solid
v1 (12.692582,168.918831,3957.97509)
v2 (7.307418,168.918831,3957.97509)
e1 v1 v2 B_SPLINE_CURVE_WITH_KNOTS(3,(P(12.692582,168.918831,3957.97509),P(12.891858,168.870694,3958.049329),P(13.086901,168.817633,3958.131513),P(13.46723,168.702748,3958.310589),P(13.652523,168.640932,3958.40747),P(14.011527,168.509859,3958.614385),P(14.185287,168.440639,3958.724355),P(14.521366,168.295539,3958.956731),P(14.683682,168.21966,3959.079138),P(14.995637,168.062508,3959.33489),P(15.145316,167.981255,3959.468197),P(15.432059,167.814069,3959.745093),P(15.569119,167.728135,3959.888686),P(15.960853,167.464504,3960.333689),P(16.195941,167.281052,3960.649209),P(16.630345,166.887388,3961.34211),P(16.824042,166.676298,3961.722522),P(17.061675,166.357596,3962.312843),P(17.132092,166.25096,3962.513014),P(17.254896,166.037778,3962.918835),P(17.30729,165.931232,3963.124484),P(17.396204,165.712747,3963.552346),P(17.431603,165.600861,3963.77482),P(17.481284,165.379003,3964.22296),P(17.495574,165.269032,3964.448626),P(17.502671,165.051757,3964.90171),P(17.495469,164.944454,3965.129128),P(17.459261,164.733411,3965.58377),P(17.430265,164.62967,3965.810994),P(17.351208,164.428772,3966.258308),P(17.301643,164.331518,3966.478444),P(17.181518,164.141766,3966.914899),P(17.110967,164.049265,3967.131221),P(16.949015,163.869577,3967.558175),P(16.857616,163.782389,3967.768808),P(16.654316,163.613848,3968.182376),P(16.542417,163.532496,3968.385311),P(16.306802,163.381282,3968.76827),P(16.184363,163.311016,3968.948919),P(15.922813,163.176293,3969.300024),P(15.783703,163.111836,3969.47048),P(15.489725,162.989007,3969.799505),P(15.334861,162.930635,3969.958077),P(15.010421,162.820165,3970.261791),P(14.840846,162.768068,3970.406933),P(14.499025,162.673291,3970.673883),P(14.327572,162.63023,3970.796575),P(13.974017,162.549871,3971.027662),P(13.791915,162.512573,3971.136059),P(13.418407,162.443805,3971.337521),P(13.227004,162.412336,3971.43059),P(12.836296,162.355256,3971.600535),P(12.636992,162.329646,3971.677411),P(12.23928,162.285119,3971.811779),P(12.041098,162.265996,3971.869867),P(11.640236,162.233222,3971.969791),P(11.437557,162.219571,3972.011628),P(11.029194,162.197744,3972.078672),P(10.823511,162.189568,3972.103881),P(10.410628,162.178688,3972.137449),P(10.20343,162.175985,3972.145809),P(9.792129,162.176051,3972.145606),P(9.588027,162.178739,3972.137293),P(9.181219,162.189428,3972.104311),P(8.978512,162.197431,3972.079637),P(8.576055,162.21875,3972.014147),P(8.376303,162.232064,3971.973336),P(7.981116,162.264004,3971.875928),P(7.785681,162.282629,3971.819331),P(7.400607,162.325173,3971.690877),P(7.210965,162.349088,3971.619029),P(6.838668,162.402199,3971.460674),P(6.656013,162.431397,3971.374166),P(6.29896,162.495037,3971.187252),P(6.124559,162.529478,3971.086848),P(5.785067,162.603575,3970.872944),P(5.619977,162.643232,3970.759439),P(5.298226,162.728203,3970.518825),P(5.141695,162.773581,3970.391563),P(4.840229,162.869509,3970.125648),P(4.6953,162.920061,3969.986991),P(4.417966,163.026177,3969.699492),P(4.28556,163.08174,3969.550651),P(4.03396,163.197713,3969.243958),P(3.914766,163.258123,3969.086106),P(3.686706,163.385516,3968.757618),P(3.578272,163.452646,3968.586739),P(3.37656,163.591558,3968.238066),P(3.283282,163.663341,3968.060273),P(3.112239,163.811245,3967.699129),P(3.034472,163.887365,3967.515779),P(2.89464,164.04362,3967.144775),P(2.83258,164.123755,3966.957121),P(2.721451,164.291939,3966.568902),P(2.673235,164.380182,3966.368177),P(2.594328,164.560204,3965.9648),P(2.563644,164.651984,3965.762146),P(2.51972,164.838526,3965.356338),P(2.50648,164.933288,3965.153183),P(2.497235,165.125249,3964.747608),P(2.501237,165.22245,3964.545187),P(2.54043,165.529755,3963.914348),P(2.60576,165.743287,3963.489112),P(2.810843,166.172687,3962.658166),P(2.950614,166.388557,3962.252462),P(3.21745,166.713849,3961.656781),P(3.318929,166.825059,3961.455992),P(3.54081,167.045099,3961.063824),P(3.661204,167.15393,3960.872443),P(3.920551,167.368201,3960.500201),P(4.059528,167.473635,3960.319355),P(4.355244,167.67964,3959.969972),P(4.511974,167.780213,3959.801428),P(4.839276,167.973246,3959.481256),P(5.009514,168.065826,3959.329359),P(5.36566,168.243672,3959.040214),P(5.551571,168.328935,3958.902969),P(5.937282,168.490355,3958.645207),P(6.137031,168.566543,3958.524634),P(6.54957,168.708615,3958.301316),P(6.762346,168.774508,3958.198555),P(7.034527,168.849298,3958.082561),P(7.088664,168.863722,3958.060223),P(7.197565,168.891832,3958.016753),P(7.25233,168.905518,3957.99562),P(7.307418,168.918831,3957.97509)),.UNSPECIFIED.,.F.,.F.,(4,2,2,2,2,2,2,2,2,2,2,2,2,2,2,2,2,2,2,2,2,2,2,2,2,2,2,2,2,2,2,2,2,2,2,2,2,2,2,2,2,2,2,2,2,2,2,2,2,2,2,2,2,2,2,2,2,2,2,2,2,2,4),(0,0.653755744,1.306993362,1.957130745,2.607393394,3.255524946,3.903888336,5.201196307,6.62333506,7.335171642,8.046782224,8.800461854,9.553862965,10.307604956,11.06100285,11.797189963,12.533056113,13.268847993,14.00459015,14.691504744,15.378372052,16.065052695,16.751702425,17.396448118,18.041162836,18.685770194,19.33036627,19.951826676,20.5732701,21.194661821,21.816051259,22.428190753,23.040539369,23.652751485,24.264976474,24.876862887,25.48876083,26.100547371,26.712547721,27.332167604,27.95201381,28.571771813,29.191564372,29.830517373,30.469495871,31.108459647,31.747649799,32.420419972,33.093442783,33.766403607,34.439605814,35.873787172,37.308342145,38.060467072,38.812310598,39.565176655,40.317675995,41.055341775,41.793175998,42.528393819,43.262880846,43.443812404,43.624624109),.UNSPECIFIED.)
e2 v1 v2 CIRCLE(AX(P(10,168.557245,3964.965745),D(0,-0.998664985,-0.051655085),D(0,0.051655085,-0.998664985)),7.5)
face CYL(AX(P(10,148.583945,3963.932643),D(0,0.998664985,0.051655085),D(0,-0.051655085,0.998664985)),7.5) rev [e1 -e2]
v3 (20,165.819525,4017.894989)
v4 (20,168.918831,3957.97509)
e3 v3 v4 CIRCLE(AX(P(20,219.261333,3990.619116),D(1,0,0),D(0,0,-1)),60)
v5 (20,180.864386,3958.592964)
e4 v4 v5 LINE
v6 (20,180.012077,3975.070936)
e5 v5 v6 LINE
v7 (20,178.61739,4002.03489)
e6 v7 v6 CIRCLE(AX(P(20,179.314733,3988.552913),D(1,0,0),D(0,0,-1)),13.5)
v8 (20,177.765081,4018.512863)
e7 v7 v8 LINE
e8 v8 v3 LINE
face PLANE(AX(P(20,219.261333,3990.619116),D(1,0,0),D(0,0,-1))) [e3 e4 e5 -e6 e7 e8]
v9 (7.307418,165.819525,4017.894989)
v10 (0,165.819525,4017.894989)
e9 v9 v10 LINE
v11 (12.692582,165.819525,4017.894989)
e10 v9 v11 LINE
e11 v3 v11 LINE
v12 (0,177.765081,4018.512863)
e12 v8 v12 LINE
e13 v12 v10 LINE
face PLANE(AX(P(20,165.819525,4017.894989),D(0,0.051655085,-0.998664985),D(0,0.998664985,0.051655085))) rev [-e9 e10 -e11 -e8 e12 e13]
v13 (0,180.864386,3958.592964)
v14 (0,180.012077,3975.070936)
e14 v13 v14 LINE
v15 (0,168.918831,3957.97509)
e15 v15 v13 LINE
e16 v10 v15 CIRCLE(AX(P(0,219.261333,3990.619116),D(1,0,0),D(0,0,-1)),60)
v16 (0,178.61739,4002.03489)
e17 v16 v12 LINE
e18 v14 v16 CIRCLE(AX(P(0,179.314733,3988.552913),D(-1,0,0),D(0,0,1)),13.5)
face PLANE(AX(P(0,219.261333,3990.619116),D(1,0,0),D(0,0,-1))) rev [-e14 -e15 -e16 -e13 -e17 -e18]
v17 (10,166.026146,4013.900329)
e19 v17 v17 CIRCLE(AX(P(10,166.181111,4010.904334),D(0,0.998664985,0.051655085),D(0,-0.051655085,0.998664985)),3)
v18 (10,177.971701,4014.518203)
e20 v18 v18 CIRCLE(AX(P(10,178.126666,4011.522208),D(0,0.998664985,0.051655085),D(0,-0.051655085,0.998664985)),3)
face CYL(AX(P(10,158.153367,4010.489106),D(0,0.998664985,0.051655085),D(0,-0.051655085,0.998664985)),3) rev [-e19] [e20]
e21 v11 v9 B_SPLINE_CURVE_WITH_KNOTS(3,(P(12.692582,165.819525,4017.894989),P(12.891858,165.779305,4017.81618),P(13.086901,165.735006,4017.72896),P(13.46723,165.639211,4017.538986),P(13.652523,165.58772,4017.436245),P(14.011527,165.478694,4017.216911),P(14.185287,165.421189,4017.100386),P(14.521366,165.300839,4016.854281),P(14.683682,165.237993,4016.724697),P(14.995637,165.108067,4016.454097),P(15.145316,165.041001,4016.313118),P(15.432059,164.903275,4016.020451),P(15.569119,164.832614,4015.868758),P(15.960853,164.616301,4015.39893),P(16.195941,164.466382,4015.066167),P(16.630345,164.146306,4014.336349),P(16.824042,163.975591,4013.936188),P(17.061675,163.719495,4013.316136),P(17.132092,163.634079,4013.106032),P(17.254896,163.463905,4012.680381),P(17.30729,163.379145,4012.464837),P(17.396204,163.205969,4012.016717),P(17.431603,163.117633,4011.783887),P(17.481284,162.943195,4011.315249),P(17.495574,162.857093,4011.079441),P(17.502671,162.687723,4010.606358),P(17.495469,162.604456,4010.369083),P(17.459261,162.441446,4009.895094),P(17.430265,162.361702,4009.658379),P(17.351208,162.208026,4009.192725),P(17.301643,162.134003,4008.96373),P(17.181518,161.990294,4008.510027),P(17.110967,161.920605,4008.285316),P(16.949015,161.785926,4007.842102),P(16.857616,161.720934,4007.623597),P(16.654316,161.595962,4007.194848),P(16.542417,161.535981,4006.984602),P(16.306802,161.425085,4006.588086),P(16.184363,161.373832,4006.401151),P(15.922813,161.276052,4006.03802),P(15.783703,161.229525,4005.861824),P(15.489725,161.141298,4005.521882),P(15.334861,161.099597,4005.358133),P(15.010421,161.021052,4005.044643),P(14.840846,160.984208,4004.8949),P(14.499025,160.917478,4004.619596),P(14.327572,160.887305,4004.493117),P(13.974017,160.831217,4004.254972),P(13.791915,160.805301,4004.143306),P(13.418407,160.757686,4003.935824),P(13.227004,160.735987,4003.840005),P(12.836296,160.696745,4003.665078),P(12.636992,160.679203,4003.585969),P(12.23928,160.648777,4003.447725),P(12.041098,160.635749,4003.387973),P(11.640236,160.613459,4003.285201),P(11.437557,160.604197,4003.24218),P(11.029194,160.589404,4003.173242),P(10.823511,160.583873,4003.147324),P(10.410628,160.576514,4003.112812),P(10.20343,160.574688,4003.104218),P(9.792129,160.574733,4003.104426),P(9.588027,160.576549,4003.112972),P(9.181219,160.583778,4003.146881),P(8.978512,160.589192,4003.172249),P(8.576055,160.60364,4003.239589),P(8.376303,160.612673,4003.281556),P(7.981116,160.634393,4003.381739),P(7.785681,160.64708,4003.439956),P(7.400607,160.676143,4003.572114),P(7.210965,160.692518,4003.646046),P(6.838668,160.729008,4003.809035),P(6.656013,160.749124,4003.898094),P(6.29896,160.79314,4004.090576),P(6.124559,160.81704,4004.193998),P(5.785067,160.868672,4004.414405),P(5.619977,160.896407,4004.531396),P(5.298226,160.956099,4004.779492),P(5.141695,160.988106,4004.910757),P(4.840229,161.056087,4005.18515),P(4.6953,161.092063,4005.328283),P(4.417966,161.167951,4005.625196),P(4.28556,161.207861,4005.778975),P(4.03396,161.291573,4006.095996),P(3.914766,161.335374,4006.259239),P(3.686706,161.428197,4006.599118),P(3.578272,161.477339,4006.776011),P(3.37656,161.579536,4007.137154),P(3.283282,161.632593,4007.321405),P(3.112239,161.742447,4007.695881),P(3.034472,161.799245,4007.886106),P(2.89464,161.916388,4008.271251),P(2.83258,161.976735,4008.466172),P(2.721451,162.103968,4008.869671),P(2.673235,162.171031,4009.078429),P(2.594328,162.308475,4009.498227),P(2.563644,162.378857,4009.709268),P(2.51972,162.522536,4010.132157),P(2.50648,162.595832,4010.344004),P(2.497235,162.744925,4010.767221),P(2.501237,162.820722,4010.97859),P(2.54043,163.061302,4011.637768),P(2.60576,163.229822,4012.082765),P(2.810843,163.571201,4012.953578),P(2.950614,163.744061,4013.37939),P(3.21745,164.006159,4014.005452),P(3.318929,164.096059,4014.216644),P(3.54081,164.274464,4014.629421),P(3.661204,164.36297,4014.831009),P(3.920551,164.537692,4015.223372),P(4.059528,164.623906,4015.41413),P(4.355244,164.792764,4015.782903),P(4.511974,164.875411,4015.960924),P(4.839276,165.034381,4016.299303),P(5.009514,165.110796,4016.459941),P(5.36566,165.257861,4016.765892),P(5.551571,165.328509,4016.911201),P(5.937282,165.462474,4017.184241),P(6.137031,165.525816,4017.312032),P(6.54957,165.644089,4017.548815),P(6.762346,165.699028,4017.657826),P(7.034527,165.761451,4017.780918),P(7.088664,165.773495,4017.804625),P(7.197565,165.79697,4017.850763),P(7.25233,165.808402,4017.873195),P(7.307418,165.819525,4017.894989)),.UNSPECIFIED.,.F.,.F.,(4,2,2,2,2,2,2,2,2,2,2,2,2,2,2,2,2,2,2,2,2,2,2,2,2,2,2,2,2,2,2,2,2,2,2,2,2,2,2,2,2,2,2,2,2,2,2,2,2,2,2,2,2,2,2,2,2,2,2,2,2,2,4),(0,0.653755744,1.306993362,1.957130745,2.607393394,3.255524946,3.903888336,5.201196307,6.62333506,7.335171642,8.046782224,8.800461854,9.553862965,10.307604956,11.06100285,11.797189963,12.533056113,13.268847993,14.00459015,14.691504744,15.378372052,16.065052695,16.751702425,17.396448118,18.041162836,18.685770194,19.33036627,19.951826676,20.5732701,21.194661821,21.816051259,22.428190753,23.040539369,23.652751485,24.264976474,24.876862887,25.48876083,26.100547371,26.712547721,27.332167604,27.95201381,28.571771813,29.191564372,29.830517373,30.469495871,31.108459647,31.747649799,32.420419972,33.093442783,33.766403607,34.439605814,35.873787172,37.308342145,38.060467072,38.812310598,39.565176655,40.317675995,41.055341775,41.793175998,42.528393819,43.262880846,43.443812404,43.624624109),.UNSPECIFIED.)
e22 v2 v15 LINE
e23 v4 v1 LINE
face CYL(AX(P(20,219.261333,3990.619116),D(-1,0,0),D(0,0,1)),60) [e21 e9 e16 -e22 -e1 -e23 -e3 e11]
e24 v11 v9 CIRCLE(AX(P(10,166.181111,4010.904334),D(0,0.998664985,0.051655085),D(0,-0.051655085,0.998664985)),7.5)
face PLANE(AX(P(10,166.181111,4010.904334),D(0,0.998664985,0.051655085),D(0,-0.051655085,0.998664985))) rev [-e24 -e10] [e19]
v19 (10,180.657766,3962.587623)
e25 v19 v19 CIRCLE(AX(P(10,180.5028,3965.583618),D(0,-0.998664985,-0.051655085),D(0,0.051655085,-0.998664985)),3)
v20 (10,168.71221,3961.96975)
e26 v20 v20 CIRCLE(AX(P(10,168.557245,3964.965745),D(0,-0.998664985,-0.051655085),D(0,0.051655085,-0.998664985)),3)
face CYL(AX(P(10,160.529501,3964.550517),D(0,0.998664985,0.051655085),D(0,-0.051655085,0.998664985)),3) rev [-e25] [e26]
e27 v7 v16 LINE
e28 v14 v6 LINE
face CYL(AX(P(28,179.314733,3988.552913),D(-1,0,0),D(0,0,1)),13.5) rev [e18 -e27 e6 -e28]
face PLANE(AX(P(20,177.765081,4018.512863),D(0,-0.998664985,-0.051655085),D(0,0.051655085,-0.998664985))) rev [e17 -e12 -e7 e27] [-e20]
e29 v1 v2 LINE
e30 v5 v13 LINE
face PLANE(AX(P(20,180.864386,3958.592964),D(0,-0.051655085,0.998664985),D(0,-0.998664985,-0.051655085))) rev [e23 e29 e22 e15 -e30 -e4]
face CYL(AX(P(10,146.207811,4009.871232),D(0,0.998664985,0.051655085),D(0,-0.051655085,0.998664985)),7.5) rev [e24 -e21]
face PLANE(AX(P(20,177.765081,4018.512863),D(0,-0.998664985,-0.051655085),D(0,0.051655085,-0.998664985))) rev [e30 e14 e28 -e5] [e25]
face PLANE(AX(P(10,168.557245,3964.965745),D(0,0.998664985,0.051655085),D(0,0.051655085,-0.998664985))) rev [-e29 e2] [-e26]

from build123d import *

# Parameters (mm, degrees)
EXTRUDE_1_DEPTH     = 20
SKETCH_3_R          = 14
CUT_EXTRUDE_1_DEPTH = 20
SKETCH_4_R          = 3
CUT_EXTRUDE_2_DEPTH = 22.516585743
EXTRUDE_2_DEPTH     = 20
SKETCH_7_R          = 13.5
CUT_EXTRUDE_3_DEPTH = 28
SKETCH_8_R          = 3
CUT_EXTRUDE_4_DEPTH = 20
SKETCH_9_R          = 7.5
SKETCH_9_R_2        = 3
CUT_EXTRUDE_5_DEPTH = 20


# Read off the part's stored shape, not the designer's step: 填料-伸長1
with BuildPart() as part:
    # 填料-伸長1 outline → 填料-伸長1 (new body)
    with BuildSketch(Plane(origin=(0, 0, 0), x_dir=(0, 0, -1), z_dir=(1, 0, 0))):
        Polygon((-4019.675958787, 200.25160655), (-4018.512862627, 177.765080788), (-3958.59296353, 180.864385914), (-3959.75605969, 203.350911676), align=None)
    extrude(amount=EXTRUDE_1_DEPTH)

    # 草圖3 → 除料-伸長1 (cut)
    with BuildSketch(Plane.ZY):
        with Locations((3988.552913079, 179.314733351)):
            Circle(SKETCH_3_R)
    extrude(amount=-CUT_EXTRUDE_1_DEPTH, mode=Mode.SUBTRACT)

    # 草圖4 → 除料-伸長2 (cut)
    with BuildSketch(Plane(origin=(0, 407.076792548, 21.055696166), x_dir=(1, 0, 0), z_dir=(0, 0.9986649849421085, 0.051655085428040495))):
        with Locations(Location((10, -3950.965617011, 0), (0, 0, 270))):
            Circle(SKETCH_4_R)
    cut_extrude_2 = extrude(amount=-CUT_EXTRUDE_2_DEPTH, mode=Mode.SUBTRACT)

    # 鏡射1: 除料-伸長2 across plane
    add(cut_extrude_2.mirror(Plane(origin=(0, -205.275533435, 3968.660313072), x_dir=(1, 0, 0), z_dir=(0, 0.05165508542804326, -0.9986649849421085))), mode=Mode.SUBTRACT)


with BuildPart() as body_2:
    # 草圖6 → 填料-伸長2 (new body)
    with BuildSketch(Plane(origin=(0, 0, 0), x_dir=(0, 0, -1), z_dir=(1, 0, 0))):
        with BuildLine():
            Line((-4017.894989071, 165.819525376), (-4018.512862627, 177.765080788))
            Line((-4018.512862627, 177.765080788), (-3958.59296353, 180.864385914))
            Line((-3958.59296353, 180.864385914), (-3957.975089975, 168.918830502))
            ThreePointArc((-3957.975089975, 168.918830502), (-3987.51981137, 159.341433652), (-4017.894989071, 165.819525376))
        make_face()
    extrude(amount=EXTRUDE_2_DEPTH)

    # 草圖7 → 除料-伸長3 (cut)
    with BuildSketch(Plane.ZY):
        with Locations((3988.552913079, 179.314733351)):
            Circle(SKETCH_7_R)
    extrude(amount=-CUT_EXTRUDE_3_DEPTH, mode=Mode.SUBTRACT)

    # 草圖8 → 除料-伸長4 (cut)
    with BuildSketch(Plane(origin=(0, 384.590266786, 19.892600006), x_dir=(1, 0, 0), z_dir=(0, 0.9986649849421085, 0.05165508542804074))):
        with Locations(Location((10, -3996.965617011, 0), (0, 0, 270))):
            Circle(SKETCH_8_R)
    cut_extrude_4 = extrude(amount=-CUT_EXTRUDE_4_DEPTH, mode=Mode.SUBTRACT)

    # 草圖9 → 除料-伸長5 (cut)
    with BuildSketch(Plane(origin=(0, 372.644711374, 19.27472645), x_dir=(1, 0, 0), z_dir=(0, 0.9986649849421085, 0.05165508542804074))):
        with Locations((10, -3996.965617011)):
            Circle(SKETCH_9_R)
        with Locations(Location((10, -3996.965617011, 0), (0, 0, 270))):
            Circle(SKETCH_9_R_2, mode=Mode.SUBTRACT)
    cut_extrude_5 = extrude(amount=-CUT_EXTRUDE_5_DEPTH, mode=Mode.SUBTRACT)

    # 鏡射4: 除料-伸長4, 除料-伸長5 across plane
    add(cut_extrude_4.mirror(Plane(origin=(0, -205.275533435, 3968.660313072), x_dir=(1, 0, 0), z_dir=(0, 0.05165508542804326, -0.9986649849421085))), mode=Mode.SUBTRACT)
    add(cut_extrude_5.mirror(Plane(origin=(0, -205.275533435, 3968.660313072), x_dir=(1, 0, 0), z_dir=(0, 0.05165508542804326, -0.9986649849421085))), mode=Mode.SUBTRACT)


solid = body_2.part
